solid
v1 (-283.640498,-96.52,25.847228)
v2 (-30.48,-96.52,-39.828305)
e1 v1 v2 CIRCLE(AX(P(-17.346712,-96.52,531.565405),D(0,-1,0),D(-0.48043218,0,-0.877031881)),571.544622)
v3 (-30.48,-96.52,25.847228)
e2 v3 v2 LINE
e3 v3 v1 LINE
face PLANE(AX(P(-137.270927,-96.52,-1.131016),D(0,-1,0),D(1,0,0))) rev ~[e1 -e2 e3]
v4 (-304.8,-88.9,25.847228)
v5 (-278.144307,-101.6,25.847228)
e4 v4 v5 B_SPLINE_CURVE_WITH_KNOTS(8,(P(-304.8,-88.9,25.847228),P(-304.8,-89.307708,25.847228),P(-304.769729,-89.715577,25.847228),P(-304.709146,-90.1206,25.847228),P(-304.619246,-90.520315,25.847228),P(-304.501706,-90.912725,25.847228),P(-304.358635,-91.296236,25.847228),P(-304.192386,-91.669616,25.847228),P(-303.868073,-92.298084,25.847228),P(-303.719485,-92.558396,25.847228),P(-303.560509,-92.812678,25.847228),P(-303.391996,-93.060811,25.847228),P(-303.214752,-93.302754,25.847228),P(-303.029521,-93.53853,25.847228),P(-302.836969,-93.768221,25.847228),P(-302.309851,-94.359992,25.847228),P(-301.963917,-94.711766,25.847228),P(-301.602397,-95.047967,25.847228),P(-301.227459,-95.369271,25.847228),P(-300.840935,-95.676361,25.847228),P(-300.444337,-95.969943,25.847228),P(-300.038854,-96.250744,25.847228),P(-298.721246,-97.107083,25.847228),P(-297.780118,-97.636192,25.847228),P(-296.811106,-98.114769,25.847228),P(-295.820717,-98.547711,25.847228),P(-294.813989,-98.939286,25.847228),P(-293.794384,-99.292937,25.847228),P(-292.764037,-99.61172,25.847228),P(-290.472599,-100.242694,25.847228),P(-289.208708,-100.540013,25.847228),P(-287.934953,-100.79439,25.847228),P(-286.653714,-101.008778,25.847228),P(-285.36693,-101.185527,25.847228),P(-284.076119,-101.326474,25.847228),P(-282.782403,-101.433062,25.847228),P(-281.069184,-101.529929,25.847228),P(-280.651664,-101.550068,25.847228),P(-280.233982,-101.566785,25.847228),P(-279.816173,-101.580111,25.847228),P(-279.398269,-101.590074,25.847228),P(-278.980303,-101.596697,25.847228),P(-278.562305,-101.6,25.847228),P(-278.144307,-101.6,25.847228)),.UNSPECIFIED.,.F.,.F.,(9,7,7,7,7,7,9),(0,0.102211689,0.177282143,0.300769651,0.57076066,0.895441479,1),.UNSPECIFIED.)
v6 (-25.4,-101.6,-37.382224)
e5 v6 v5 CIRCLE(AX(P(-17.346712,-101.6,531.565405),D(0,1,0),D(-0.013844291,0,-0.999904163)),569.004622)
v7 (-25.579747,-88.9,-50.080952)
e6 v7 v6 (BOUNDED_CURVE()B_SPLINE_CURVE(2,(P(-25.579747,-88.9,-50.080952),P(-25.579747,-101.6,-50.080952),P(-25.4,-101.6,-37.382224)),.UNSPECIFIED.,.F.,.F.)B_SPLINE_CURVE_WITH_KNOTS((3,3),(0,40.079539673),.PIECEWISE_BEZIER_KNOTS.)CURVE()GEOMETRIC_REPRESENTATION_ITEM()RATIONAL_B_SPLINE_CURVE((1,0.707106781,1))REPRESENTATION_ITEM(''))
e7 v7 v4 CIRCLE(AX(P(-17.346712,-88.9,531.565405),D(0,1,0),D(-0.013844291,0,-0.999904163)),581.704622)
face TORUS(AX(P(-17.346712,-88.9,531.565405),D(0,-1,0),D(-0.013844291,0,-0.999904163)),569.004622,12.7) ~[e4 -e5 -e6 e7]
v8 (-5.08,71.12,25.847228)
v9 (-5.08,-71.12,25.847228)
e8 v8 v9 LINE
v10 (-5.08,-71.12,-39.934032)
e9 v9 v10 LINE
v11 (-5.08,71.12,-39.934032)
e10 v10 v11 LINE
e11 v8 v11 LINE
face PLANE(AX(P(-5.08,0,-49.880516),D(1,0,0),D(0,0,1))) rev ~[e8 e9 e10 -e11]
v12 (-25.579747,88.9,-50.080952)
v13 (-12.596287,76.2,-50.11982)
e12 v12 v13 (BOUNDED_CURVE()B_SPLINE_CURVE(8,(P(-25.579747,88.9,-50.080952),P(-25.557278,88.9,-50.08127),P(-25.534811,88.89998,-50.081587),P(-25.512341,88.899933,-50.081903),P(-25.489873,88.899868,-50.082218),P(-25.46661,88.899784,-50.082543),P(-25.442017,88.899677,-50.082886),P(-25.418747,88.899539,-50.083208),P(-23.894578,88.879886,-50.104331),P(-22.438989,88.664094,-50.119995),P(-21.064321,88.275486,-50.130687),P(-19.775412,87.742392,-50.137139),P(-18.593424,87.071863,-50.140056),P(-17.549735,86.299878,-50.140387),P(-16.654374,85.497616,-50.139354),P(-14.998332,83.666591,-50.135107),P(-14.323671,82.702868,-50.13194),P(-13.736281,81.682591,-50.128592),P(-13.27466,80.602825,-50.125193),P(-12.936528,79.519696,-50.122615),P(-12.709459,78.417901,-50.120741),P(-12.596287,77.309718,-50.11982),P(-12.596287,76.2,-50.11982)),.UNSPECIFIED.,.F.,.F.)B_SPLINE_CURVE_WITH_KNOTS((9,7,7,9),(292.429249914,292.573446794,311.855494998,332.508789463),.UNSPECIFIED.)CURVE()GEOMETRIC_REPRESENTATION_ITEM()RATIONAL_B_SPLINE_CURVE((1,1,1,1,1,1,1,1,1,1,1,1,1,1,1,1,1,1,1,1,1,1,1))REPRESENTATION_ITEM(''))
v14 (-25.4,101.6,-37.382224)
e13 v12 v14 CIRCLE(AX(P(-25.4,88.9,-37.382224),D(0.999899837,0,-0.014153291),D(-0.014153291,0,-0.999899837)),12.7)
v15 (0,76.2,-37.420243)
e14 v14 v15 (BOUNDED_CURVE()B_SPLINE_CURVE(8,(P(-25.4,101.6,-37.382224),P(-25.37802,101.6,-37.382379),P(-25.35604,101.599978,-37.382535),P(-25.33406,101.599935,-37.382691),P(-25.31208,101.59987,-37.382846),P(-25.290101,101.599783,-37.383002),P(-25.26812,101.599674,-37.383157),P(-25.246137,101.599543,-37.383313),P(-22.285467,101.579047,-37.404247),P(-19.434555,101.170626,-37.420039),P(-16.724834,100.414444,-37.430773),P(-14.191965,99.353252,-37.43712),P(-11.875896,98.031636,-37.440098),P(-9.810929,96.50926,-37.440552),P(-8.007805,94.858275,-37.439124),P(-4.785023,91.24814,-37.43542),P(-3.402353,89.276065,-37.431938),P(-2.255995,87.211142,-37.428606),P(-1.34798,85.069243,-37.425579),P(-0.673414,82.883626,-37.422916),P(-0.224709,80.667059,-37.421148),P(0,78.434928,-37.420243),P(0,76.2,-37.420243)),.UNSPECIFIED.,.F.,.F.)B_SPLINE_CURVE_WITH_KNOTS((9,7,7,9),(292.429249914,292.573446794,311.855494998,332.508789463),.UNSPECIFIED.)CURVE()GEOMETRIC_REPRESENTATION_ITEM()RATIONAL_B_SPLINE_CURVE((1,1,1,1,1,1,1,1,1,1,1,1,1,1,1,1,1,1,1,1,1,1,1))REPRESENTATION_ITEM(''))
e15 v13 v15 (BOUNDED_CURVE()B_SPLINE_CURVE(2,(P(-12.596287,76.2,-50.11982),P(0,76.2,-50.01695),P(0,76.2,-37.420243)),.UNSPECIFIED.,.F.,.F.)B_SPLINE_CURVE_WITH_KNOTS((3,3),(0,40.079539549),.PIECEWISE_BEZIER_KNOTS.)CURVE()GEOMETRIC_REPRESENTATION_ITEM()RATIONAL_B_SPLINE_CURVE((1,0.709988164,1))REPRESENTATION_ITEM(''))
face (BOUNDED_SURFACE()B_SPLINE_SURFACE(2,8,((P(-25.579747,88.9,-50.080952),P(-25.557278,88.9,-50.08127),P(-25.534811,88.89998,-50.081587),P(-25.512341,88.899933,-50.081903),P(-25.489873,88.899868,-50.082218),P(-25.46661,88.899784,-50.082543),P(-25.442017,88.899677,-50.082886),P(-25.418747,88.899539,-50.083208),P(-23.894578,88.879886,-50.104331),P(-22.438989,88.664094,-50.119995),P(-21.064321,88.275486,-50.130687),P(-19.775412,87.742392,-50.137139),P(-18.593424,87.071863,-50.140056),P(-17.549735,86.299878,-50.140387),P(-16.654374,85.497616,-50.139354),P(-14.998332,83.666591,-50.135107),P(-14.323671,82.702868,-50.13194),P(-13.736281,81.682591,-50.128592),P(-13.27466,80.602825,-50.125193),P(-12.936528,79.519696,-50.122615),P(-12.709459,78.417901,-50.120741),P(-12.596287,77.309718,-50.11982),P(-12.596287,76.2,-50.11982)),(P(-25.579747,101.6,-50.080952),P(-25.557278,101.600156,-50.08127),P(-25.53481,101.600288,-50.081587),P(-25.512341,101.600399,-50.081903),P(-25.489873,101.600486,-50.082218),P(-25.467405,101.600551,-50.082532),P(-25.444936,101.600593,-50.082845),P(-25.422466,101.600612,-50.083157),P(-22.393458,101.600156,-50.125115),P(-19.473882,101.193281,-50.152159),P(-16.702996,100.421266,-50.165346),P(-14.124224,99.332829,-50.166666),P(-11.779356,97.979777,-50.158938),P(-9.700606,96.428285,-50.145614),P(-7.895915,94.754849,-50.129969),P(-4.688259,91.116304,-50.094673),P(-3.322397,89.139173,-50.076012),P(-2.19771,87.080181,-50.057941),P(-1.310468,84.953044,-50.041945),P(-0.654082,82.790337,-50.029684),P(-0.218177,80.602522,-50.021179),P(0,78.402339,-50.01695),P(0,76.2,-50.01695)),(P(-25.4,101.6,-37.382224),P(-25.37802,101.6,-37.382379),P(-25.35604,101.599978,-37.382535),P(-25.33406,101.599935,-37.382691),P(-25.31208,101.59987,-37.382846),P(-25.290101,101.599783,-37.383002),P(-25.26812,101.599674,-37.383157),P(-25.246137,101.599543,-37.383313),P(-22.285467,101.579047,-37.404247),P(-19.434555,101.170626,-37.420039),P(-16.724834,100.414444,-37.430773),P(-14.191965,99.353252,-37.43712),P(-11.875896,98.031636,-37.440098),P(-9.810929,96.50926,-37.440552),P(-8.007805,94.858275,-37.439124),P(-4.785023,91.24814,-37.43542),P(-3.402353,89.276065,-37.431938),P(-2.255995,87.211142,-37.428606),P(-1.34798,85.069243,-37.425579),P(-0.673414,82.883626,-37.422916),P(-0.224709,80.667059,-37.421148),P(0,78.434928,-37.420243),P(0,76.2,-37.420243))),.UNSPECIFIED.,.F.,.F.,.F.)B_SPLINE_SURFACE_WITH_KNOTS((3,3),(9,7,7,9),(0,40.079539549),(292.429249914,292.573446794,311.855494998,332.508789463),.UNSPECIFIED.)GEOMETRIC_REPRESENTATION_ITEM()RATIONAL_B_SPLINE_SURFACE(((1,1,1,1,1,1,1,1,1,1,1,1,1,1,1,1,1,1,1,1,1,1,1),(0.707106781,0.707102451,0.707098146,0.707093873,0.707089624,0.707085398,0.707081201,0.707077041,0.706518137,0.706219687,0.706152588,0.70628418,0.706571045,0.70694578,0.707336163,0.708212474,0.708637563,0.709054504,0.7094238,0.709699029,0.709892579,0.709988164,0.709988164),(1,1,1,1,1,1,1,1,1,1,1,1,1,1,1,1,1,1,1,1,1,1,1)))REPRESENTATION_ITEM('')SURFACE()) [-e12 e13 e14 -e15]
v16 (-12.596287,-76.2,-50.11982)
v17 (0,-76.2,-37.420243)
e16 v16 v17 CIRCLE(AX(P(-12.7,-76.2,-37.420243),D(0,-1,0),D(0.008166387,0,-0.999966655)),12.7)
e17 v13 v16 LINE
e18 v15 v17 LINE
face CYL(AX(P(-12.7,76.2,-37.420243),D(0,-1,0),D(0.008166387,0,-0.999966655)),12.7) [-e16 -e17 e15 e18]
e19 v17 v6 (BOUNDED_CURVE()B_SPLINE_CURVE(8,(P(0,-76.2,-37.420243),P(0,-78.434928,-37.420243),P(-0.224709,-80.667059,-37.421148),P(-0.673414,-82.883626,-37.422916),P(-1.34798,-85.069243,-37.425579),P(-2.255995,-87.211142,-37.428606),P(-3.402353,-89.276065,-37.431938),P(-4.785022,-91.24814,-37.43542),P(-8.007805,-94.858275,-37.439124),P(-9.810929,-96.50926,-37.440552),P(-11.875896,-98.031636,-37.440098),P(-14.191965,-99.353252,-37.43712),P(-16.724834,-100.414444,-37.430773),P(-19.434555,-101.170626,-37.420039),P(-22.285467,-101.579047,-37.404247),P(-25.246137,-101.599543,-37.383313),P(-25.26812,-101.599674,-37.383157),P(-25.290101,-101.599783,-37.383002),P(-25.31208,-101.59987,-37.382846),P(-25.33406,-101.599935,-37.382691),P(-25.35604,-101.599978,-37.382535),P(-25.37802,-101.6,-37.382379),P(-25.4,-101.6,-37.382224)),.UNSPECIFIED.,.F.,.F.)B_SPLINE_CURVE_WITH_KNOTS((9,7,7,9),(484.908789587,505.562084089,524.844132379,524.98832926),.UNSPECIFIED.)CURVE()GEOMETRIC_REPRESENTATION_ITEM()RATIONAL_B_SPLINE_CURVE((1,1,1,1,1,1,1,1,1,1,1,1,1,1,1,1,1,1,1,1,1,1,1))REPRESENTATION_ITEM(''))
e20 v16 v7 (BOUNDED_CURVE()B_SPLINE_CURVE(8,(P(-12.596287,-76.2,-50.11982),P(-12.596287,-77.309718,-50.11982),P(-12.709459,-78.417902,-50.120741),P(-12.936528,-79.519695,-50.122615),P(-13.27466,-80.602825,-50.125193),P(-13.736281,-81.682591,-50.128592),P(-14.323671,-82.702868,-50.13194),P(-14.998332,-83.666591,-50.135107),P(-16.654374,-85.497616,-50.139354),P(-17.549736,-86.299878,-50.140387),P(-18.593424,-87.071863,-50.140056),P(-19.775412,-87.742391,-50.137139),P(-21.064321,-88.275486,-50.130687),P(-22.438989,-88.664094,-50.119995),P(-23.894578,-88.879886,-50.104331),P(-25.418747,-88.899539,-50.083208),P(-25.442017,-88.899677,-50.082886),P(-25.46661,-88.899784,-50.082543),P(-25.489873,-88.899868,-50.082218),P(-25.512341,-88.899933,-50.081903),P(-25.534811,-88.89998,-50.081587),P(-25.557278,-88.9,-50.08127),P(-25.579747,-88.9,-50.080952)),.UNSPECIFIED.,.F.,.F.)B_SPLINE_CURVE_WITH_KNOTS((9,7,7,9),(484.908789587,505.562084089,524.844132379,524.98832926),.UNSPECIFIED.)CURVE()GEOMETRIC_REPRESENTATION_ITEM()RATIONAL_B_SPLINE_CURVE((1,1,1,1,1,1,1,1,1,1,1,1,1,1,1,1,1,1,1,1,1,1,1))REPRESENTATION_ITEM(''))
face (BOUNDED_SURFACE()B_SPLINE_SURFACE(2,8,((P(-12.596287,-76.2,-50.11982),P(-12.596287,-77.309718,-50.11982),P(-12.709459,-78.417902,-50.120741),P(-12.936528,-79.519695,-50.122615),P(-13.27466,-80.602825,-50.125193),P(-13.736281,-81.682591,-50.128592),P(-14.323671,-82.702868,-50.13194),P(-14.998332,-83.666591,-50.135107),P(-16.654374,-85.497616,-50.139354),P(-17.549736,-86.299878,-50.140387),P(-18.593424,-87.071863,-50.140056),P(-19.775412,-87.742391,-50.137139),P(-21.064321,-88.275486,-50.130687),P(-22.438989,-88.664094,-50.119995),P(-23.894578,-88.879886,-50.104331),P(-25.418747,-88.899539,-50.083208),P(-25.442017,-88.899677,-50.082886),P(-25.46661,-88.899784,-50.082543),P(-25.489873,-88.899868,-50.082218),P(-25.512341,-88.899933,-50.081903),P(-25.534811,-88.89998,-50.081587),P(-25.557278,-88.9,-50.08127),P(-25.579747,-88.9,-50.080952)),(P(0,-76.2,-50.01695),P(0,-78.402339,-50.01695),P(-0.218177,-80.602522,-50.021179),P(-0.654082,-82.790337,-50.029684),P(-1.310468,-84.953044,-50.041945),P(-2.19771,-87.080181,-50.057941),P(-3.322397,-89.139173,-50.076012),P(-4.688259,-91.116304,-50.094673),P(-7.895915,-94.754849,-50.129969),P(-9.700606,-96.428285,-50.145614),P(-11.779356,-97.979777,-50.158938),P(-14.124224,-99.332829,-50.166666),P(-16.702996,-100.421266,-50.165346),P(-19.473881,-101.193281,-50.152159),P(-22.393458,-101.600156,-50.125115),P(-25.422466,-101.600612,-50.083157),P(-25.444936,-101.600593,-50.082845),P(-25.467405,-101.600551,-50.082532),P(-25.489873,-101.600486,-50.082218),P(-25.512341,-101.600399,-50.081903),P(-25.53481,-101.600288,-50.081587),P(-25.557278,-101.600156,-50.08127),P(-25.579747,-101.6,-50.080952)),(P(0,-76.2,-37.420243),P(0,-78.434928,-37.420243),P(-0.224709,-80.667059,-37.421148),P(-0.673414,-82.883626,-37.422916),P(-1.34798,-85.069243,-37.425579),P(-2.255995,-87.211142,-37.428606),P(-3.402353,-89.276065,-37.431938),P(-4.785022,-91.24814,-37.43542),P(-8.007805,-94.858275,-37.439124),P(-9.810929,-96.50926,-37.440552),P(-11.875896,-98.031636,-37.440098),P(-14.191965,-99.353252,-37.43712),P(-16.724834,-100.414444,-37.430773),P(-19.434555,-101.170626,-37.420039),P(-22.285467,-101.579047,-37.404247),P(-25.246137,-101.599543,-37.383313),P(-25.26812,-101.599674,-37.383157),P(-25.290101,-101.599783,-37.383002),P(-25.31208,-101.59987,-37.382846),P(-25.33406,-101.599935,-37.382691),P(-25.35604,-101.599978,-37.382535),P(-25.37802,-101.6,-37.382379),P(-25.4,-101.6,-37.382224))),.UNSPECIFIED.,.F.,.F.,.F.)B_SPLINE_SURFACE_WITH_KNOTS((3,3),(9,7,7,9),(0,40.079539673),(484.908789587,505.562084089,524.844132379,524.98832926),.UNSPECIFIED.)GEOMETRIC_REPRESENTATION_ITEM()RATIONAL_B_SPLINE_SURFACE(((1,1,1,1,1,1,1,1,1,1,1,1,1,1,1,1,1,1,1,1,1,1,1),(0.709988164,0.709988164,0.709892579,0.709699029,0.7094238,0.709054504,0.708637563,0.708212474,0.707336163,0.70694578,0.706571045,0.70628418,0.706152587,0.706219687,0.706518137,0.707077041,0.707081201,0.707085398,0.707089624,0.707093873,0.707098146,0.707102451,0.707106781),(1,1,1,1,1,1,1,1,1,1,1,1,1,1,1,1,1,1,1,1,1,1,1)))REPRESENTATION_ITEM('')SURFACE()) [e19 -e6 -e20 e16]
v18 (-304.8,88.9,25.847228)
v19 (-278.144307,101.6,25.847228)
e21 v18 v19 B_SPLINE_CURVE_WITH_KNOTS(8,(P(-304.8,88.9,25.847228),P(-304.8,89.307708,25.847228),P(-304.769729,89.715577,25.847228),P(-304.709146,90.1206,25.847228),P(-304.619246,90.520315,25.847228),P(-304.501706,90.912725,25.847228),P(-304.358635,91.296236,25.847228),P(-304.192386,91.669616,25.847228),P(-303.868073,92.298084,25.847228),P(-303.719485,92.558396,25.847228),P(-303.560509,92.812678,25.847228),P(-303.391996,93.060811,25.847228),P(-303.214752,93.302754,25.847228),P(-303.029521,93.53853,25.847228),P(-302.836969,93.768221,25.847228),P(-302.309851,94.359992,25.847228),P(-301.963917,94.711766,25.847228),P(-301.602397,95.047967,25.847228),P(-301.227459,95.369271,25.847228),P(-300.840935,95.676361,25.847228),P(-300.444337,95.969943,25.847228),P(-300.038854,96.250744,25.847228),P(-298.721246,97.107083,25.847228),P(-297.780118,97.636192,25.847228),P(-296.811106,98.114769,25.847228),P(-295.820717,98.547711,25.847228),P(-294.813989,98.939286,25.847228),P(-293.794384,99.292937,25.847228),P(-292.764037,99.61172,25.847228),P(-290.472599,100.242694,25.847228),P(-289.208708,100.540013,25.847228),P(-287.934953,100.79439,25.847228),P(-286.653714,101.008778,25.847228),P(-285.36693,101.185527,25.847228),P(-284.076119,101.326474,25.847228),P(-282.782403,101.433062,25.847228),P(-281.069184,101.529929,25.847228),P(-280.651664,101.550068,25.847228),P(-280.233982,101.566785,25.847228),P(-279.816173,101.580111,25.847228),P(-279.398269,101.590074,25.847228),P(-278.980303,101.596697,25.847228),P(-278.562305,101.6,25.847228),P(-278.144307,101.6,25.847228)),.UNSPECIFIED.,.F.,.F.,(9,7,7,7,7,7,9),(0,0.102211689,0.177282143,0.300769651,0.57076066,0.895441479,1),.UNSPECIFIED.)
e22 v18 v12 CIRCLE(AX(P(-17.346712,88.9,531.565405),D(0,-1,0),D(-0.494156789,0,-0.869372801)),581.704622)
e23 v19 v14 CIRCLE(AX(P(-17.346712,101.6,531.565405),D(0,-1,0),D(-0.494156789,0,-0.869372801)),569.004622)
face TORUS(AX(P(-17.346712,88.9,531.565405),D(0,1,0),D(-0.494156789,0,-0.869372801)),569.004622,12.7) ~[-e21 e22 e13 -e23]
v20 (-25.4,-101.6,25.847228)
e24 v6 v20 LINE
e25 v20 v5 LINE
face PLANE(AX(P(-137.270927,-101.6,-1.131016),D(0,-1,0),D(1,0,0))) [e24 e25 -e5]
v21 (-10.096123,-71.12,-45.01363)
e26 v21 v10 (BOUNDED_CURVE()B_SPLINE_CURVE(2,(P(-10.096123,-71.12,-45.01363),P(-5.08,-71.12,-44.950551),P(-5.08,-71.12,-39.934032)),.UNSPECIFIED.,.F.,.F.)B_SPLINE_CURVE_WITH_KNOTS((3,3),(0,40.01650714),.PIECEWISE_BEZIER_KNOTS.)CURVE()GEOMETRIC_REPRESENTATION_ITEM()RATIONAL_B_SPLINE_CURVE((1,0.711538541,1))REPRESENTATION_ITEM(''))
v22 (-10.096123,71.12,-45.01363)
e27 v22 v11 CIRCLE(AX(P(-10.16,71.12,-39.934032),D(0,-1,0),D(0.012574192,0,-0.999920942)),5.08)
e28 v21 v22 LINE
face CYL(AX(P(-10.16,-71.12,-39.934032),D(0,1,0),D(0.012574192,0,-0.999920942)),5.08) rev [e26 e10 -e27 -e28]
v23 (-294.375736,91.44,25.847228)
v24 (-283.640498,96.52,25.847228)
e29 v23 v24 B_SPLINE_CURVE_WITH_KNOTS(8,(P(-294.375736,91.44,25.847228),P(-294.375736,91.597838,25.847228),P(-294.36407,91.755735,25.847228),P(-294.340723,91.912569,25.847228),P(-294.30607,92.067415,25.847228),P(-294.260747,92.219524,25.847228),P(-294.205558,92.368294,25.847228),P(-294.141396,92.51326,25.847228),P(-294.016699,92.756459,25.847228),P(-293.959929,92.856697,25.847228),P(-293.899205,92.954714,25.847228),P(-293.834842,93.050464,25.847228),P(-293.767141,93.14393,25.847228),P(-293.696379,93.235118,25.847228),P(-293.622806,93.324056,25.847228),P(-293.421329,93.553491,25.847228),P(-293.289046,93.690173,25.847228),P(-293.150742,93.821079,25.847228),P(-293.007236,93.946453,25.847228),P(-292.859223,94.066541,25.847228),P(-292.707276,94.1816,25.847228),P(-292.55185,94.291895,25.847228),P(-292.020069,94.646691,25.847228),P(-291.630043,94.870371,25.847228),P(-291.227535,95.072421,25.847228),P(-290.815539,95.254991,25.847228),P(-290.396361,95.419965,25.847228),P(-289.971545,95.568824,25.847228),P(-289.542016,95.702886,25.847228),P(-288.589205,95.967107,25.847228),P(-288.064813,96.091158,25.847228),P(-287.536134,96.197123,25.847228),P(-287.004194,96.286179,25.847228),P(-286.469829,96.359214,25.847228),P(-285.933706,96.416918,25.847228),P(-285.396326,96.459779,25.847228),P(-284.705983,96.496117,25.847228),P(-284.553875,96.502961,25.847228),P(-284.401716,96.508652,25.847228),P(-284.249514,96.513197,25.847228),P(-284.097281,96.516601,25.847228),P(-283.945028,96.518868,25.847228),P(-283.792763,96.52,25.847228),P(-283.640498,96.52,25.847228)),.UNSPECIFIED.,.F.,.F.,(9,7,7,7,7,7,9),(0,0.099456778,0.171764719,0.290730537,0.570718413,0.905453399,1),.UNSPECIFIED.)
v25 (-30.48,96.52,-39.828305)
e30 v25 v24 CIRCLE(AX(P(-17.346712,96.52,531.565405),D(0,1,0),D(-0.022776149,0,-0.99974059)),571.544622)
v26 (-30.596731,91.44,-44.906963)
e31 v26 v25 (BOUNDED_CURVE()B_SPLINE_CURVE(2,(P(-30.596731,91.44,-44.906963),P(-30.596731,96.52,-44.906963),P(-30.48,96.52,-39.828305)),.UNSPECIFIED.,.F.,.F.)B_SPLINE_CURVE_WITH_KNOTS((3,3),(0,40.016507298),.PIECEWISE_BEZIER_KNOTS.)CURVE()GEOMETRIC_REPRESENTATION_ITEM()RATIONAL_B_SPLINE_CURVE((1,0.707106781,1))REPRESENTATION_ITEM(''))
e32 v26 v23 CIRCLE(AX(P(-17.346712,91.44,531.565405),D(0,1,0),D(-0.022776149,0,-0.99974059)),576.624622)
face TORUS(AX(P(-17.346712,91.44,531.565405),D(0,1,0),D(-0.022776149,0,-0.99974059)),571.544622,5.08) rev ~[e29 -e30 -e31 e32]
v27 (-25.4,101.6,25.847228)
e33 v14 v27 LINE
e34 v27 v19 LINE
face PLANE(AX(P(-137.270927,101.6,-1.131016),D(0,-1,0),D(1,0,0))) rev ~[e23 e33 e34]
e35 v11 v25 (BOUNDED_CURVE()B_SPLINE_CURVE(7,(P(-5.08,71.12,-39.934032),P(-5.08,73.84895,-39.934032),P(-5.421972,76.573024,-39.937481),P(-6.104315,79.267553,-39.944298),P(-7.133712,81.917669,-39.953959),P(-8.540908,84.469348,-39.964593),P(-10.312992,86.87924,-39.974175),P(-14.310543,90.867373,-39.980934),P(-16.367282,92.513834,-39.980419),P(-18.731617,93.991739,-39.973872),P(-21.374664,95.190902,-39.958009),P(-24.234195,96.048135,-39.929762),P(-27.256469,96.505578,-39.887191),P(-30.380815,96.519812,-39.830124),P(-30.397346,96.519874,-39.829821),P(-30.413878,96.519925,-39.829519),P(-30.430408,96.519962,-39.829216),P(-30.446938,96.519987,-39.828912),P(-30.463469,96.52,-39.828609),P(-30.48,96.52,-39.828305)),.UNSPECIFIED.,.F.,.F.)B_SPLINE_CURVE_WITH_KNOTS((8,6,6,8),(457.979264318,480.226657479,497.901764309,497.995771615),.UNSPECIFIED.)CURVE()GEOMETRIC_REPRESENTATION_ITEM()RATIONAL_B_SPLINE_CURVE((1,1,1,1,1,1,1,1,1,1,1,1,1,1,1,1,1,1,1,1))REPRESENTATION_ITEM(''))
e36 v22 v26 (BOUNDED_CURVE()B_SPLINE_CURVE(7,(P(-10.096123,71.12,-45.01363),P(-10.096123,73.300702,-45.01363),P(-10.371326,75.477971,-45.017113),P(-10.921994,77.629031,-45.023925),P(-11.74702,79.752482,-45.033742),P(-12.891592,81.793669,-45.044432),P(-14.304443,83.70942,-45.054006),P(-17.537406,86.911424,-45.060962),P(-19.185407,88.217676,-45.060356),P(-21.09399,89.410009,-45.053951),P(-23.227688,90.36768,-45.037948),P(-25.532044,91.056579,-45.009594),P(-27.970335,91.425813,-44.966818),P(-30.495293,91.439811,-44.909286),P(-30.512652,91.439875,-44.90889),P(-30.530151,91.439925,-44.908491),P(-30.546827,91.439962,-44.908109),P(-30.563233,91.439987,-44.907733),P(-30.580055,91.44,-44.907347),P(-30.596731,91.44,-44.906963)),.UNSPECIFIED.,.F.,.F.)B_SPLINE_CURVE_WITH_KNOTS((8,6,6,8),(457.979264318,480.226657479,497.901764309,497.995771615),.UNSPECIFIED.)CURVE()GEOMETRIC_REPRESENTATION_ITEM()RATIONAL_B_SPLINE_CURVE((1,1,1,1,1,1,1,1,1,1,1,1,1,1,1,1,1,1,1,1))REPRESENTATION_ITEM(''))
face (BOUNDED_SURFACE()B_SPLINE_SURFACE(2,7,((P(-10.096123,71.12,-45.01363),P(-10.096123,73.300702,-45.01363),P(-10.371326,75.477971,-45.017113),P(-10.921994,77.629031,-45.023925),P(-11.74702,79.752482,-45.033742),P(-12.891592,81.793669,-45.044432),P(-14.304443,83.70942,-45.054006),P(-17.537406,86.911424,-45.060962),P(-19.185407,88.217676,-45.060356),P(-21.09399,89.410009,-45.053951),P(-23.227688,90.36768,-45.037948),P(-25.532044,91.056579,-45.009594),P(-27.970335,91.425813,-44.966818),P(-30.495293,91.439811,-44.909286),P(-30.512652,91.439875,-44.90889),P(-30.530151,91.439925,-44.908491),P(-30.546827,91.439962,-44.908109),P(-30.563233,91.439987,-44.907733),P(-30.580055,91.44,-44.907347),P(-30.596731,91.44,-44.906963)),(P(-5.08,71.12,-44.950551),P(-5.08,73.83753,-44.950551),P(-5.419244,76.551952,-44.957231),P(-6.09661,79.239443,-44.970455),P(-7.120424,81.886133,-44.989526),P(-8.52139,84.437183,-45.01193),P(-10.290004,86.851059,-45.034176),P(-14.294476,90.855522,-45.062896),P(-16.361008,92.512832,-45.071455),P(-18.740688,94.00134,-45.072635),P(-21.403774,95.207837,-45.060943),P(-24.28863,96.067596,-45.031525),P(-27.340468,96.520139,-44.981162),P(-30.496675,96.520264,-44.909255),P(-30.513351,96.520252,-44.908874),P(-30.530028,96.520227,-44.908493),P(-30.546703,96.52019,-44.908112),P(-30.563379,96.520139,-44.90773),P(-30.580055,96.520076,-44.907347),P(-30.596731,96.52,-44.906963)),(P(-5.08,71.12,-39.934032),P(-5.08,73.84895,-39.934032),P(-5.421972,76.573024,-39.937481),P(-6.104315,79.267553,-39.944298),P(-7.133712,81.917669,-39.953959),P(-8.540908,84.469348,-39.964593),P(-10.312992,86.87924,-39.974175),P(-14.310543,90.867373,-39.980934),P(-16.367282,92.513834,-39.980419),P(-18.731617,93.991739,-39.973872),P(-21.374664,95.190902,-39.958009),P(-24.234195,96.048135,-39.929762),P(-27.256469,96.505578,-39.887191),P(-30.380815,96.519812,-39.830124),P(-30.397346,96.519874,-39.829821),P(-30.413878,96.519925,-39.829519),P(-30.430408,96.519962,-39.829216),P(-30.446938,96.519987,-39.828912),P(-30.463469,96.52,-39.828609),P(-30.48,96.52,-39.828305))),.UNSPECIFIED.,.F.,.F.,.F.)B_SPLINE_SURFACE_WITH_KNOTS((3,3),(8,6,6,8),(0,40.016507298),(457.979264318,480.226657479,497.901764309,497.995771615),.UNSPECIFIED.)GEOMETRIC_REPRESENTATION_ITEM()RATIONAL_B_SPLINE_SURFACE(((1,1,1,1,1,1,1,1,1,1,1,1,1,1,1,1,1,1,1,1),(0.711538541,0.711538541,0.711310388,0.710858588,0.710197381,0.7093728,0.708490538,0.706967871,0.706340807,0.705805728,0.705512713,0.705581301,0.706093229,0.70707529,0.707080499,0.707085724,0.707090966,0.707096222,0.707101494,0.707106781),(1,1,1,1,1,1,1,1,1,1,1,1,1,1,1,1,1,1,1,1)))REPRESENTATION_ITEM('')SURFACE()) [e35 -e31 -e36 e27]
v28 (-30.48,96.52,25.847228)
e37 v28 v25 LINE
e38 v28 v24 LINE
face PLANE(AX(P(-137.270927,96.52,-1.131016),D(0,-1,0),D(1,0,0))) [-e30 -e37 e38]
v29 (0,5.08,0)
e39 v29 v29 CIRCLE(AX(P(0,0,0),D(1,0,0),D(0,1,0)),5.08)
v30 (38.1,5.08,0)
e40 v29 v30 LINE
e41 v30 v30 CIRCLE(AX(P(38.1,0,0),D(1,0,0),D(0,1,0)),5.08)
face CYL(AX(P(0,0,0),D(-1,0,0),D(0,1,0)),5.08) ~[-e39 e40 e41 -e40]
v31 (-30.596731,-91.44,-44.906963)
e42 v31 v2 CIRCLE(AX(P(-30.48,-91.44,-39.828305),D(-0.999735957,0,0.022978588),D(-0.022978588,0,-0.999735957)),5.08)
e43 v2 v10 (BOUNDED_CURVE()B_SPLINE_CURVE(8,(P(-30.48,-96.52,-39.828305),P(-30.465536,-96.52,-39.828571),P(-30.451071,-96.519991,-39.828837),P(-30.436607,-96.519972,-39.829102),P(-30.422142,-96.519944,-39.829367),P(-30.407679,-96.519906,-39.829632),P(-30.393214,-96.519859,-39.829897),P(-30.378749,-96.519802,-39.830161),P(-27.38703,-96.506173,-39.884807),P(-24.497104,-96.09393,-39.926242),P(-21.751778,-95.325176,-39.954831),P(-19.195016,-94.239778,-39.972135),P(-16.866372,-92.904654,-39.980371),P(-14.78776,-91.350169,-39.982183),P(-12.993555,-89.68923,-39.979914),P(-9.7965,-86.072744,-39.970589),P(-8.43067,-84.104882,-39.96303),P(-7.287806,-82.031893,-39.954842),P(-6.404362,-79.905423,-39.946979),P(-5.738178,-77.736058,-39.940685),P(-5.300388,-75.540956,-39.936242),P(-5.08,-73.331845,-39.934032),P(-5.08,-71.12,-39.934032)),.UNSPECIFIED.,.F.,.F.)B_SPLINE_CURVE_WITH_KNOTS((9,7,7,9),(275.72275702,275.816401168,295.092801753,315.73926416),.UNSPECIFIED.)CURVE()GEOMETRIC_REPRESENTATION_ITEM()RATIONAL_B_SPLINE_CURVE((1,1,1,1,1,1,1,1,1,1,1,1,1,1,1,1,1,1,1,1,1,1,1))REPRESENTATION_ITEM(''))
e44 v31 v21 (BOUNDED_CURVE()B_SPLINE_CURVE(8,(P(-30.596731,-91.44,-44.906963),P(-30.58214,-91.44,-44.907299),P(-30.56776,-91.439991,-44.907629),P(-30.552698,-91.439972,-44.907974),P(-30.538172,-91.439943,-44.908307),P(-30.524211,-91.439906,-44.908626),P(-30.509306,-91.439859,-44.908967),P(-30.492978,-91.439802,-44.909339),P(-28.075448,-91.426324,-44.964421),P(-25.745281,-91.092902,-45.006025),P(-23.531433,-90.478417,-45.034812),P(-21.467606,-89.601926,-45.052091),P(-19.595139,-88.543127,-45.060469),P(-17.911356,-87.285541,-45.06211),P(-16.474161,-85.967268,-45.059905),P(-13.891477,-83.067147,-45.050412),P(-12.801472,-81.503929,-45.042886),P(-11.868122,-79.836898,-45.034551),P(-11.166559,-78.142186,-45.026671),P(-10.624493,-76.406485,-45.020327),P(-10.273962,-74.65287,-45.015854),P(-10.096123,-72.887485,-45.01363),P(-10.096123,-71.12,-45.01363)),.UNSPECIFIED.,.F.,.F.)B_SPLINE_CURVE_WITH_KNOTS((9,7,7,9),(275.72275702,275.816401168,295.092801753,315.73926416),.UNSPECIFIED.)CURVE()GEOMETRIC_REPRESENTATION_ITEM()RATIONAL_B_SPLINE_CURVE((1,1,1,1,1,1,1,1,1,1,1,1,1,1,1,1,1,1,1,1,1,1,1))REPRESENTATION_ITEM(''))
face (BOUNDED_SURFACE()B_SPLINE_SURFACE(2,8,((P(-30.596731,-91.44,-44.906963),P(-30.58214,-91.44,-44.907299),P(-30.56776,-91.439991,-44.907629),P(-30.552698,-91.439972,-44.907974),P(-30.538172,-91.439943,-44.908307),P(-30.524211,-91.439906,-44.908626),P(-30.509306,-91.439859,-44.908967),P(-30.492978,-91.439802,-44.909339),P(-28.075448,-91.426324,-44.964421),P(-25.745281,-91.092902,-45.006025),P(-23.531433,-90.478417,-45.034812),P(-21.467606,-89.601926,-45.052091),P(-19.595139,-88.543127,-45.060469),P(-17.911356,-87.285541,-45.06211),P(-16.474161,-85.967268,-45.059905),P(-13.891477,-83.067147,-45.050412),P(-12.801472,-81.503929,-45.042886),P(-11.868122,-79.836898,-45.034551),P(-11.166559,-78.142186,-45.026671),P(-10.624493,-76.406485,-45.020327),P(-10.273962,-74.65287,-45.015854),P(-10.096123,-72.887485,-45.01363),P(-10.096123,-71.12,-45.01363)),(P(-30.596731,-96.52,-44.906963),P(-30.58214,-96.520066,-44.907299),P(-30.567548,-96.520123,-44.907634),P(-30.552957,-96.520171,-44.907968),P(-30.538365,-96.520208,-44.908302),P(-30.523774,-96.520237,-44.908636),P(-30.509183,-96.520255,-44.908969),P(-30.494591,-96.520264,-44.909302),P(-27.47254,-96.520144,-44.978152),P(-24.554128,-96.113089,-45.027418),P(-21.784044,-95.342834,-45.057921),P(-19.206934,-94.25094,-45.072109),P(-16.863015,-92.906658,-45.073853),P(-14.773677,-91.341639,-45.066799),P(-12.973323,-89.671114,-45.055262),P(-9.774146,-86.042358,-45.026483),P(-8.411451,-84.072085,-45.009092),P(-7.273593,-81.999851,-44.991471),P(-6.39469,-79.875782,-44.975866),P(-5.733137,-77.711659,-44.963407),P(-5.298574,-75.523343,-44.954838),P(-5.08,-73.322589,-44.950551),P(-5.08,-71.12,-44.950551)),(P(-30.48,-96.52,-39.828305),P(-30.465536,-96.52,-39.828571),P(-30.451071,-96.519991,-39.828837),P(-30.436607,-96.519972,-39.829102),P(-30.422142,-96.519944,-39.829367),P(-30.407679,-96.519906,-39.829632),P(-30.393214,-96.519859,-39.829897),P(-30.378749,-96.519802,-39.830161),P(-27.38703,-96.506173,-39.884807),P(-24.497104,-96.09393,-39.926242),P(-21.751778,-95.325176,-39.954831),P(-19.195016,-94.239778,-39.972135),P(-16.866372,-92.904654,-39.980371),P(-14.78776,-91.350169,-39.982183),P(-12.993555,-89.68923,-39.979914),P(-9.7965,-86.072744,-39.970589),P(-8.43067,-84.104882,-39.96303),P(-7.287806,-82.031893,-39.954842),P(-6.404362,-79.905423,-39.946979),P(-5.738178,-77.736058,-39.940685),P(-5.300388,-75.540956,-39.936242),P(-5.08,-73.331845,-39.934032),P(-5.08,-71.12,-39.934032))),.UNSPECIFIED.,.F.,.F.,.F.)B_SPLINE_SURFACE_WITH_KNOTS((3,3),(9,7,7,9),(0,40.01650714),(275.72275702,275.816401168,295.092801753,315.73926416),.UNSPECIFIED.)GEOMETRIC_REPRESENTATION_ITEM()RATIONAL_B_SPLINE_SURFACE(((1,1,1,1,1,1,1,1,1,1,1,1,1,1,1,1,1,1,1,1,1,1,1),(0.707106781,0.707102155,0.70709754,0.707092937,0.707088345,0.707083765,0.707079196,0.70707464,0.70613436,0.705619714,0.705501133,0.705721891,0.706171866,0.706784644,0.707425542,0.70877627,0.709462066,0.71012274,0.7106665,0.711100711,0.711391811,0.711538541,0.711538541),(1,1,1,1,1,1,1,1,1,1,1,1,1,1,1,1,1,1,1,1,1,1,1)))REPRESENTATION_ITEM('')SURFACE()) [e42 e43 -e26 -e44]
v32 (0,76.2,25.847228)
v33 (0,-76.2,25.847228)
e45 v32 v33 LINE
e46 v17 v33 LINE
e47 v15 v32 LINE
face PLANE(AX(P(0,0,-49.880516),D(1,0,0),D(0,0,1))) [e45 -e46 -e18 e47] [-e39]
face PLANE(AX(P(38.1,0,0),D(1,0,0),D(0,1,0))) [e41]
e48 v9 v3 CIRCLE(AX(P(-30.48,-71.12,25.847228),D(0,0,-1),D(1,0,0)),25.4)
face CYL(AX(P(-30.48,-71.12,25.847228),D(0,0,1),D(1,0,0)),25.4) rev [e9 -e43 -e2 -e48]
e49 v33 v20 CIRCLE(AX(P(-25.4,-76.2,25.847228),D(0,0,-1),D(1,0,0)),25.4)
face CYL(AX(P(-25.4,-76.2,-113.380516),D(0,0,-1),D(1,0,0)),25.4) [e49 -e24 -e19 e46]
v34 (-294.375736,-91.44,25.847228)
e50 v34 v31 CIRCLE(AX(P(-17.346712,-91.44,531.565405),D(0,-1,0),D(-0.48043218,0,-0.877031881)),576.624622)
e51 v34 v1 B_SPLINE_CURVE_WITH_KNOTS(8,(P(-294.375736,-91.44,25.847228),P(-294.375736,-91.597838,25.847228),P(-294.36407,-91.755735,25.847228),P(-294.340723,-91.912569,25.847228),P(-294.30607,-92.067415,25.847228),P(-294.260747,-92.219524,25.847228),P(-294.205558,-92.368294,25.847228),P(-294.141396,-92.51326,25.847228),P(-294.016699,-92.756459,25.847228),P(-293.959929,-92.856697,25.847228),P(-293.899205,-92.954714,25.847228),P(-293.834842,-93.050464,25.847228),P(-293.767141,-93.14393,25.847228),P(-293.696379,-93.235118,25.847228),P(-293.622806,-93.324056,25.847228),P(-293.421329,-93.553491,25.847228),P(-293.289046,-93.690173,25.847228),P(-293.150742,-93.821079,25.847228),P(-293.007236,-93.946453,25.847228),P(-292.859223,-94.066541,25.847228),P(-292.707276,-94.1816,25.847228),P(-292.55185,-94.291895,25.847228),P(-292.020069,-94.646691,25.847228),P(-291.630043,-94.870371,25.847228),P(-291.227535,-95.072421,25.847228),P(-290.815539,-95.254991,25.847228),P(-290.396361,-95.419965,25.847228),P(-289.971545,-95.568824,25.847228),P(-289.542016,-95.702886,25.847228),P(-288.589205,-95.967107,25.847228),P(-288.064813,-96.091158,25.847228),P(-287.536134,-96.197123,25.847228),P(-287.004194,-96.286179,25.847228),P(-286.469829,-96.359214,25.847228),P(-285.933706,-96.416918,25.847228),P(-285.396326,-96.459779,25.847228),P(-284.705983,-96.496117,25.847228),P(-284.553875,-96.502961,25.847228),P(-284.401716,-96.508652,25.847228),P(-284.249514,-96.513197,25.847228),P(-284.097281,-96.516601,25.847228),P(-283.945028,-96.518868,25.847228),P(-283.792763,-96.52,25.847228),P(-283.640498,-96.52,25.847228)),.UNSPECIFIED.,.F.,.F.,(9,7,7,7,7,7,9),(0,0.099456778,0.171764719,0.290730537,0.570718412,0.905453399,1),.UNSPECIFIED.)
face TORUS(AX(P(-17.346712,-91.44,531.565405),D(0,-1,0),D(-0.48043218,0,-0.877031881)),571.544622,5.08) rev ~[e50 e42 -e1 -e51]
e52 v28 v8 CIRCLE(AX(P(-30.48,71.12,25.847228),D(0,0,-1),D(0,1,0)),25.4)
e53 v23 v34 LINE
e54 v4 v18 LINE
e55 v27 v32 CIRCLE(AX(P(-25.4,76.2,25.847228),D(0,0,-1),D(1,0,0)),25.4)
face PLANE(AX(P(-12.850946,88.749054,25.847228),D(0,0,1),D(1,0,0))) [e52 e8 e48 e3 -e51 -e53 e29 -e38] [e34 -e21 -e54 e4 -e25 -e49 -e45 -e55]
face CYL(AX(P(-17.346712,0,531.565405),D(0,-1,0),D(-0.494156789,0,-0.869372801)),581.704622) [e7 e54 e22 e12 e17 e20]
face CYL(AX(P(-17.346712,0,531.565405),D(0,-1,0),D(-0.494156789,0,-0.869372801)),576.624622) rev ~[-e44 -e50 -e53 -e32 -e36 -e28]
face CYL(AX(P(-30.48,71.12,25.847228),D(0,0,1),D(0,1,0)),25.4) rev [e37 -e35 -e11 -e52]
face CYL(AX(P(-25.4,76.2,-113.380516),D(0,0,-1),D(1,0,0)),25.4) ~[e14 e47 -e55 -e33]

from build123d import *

# Parameters (mm, degrees)
F2_DEPTH     = 101.6
F3_T         = -5.08
F0_R         = 5.08
F4_DEPTH     = 38.1
F5_T4_DEPTH  = 134.2759536589
F5_S5_R      = 576.6246219757
F5_T6_DEPTH  = 71
F5_T10_DEPTH = 134.2759536589
F5_S11_R     = 576.6246219757
F5_T12_DEPTH = 71
F5_T13_DEPTH = 202.727744005
F6_R         = 12.7
F7_R         = 5.08


# Not quite as in the source:
# - a fillet or chamfer that OpenCascade refuses, or shapes differently, is made with other operations: its cross-section is extruded or revolved along the edge and cut away or added


with BuildPart() as f2:
    # F1 (on Front) → F2 (new body, symmetric)
    with BuildSketch(Plane.XZ):
        with BuildLine():
            Line((0, -49.880515784), (0, 25.847228221))
            Line((0, 25.847228221), (-304.8, 25.847228221))
            ThreePointArc((-304.8, 25.847228221), (-157.6074099904, -32.9761822695), (0, -49.880515784))
        make_face()
    extrude(amount=F2_DEPTH, both=True)

    # F3
    f3_openings = [f2.faces().sort_by_distance(p)[0] for p in [
        (-152.4, 0, 25.847228),
    ]]
    offset(amount=F3_T, openings=f3_openings)

    # F0 (on Right) → F4 (join)
    with BuildSketch(Plane.YZ):
        Circle(F0_R)
    extrude(amount=F4_DEPTH)

    # F5: fillet of radius 25.4 on 4 edges, made by hand


with BuildPart() as f5_tool2:
    # F5_s3 → F5_t4 (new body)
    with BuildSketch(Plane.XY.offset(25.847228221)):
        with BuildLine():
            ThreePointArc((-5.08, -71.12), (-12.5194877579, -89.0805122421), (-30.48, -96.52))
            Line((-30.48, -96.52), (-5.08, -96.52))
            Line((-5.08, -96.52), (-5.08, -71.12))
        make_face()
    extrude(amount=-F5_T4_DEPTH)

    # F5_s5 → F5_t6 (intersect, symmetric)
    with BuildSketch(Plane.XZ.offset(83.8)):
        with Locations((-17.3467118203, 531.5654050176)):
            Circle(F5_S5_R)
    extrude(amount=F5_T6_DEPTH, both=True, mode=Mode.INTERSECT)


with BuildPart() as f2_1:
    add(f2.part)

    # F5_t1: union F5_tool2
    add(f5_tool2.part)


with BuildPart() as f5_tool8:
    # F5_s9 → F5_t10 (new body)
    with BuildSketch(Plane.XY.offset(25.847228221)):
        with BuildLine():
            ThreePointArc((-30.48, 96.52), (-12.5194877579, 89.0805122421), (-5.08, 71.12))
            Line((-5.08, 71.12), (-5.08, 96.52))
            Line((-5.08, 96.52), (-30.48, 96.52))
        make_face()
    extrude(amount=-F5_T10_DEPTH)

    # F5_s11 → F5_t12 (intersect, symmetric)
    with BuildSketch(Plane.XZ.offset(-83.8)):
        with Locations((-17.3467118203, 531.5654050176)):
            Circle(F5_S11_R)
    extrude(amount=F5_T12_DEPTH, both=True, mode=Mode.INTERSECT)


with BuildPart() as f2_2:
    add(f2_1.part)

    # F5_t7: union F5_tool8
    add(f5_tool8.part)

    # F5_s14 → F5_t13 (cut)
    with BuildSketch(Plane.XY.offset(-113.380515784)):
        with BuildLine():
            ThreePointArc((0, -76.2), (-7.4394877579, -94.1605122421), (-25.4, -101.6))
            Line((-25.4, -101.6), (0, -101.6))
            Line((0, -101.6), (0, -76.2))
        make_face()
        with BuildLine():
            ThreePointArc((0, 76.2), (-7.4394877579, 94.1605122421), (-25.4, 101.6))
            Line((-25.4, 101.6), (0, 101.6))
            Line((0, 101.6), (0, 76.2))
        make_face()
    extrude(amount=F5_T13_DEPTH, mode=Mode.SUBTRACT)

    # F6
    f6_edges = [f2_2.edges().sort_by_distance(p)[0] for p in [
        (-7.439388, -94.160412, -50.054842),
        (0, 0, -49.880516),
        (-169.899659, -101.6, -29.779289),
        (-5.918318, 92.497978, -50.026943),
        (-169.899659, 101.6, -29.779289),
    ]]
    fillet(f6_edges, radius=F6_R)

    # F7
    f7_edges = [f2_2.edges().sort_by_distance(p)[0] for p in [
        (-166.679144, -96.52, -25.386819),
        (-10.998525, -87.418225, -45.024272),
        (-5.08, 0, -44.928725),
        (-11.01893, 87.442584, -45.024496),
        (-166.679144, 96.52, -25.386819),
    ]]
    fillet(f7_edges, radius=F7_R)


solid = f2_2.part
